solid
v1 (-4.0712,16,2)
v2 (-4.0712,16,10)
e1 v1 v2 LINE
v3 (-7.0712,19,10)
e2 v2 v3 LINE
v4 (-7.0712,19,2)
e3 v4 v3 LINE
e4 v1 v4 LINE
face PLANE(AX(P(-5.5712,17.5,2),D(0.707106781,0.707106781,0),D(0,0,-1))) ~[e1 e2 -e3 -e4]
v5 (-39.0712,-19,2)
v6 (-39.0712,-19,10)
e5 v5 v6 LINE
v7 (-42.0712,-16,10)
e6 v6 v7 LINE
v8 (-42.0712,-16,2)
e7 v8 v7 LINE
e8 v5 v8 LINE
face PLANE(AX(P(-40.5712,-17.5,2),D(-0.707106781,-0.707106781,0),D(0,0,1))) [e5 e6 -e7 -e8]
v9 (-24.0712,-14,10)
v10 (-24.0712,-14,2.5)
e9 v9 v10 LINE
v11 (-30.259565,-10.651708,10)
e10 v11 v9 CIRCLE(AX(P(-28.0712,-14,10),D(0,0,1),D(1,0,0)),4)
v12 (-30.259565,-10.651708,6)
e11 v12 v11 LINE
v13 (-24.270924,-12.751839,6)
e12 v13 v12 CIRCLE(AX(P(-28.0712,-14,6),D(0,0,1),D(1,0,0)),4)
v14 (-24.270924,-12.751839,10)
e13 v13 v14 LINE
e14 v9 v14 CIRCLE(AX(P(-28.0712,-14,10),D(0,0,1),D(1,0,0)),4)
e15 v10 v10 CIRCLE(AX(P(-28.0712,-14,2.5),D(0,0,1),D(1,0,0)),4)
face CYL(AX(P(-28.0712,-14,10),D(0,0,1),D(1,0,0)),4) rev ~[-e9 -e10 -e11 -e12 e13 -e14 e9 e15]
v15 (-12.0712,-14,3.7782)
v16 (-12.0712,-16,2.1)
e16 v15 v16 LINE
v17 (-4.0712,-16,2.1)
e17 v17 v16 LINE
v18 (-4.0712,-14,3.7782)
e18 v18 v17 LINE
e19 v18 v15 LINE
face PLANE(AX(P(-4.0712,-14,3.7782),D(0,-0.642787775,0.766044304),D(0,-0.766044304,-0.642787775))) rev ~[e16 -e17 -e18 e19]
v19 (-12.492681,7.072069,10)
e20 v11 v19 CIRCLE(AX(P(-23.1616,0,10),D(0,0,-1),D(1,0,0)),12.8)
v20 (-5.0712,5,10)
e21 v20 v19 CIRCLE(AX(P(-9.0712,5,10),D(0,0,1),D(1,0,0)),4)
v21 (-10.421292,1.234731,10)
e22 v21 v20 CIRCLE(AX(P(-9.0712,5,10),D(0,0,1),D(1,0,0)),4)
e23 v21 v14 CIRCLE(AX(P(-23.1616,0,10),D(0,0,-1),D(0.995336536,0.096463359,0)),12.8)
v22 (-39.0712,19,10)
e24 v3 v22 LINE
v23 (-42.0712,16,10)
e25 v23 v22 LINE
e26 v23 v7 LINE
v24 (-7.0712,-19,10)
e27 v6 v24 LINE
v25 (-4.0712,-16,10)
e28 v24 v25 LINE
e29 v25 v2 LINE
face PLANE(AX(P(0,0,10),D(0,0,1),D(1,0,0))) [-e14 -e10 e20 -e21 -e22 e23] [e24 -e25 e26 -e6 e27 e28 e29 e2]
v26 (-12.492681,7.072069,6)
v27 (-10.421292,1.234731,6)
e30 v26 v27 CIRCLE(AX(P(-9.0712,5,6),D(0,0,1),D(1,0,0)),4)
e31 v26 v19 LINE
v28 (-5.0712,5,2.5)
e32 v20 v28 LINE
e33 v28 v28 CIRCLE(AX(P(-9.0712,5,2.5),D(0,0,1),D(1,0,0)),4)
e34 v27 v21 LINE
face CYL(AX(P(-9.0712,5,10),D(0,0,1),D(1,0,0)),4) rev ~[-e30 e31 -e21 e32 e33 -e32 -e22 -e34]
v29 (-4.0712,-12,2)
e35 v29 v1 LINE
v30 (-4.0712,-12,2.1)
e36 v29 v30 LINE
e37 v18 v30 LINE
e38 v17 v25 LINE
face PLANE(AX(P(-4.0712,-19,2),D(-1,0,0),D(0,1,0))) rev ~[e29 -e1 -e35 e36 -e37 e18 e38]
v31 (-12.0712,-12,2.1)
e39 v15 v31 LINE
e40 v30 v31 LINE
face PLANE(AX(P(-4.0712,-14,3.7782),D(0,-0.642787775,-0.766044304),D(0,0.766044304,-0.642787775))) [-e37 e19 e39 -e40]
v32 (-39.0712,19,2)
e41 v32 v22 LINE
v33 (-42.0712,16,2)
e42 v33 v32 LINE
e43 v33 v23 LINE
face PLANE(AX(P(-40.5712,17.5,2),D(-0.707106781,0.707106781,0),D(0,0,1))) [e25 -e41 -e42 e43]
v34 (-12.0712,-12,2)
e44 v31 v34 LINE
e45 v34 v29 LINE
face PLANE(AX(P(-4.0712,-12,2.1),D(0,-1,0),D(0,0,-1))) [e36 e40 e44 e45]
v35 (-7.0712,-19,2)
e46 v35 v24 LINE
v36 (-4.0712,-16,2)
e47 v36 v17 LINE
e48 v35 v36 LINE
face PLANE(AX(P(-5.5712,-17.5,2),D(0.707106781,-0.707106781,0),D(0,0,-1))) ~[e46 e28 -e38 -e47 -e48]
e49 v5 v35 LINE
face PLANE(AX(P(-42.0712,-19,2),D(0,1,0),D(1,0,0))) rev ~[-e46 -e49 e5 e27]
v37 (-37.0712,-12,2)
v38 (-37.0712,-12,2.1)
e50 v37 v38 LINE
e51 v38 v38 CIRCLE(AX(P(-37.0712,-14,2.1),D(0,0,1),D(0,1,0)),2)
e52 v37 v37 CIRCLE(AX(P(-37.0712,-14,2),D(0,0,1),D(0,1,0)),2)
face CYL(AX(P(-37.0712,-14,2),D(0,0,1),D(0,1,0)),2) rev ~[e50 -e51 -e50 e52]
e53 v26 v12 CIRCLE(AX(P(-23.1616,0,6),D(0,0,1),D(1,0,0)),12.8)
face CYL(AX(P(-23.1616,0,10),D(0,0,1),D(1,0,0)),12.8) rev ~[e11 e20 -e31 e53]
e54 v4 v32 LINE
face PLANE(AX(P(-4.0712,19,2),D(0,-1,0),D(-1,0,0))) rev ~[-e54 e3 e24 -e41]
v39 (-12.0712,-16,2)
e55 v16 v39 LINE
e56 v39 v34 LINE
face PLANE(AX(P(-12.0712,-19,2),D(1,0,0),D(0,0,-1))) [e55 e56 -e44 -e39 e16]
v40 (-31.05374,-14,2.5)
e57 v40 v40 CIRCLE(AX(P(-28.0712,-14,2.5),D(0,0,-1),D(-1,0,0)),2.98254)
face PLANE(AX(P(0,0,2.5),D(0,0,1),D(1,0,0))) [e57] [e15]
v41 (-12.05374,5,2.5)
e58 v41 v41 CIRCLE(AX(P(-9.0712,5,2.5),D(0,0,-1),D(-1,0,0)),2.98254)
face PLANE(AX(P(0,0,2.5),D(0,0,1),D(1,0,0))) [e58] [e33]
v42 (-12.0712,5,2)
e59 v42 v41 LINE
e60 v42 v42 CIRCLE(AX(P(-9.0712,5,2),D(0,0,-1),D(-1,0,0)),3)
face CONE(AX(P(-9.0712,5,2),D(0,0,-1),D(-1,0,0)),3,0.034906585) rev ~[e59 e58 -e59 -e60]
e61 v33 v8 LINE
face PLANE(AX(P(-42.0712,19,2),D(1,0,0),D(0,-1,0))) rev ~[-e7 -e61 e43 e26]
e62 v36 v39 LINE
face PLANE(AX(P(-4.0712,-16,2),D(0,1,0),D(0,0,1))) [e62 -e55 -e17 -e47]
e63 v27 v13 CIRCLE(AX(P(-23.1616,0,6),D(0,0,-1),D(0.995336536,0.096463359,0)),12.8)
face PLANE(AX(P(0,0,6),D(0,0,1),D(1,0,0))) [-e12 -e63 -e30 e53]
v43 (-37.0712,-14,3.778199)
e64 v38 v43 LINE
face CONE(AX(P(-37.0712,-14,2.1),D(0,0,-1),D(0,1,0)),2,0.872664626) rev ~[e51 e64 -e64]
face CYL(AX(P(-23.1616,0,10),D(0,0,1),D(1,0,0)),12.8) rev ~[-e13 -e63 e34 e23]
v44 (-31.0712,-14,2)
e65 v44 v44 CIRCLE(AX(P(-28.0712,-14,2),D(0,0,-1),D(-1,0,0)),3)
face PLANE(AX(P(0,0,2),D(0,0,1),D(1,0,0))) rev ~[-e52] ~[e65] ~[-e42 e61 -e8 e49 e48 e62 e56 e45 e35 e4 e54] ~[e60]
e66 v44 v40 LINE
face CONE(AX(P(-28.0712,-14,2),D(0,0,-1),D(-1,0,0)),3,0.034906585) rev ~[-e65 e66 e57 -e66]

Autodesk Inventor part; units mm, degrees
ref_plane "YZ Plane" through (0, 0, 0) normal (1, 0, 0) x (0, 1, 0)
ref_plane "XZ Plane" through (0, 0, 0) normal (0, 1, 0) x (-1, 0, 0)
ref_plane "XY Plane" through (0, 0, 0) normal (0, 0, 1) x (1, 0, 0)
ref_plane "Work Plane1" through (0, 0, 2) normal (0, 0, 1) x (1, 0, 0)
sketch "Sketch1" plane through (0, 0, 2) normal (0, 0, 1) x (1, 0, 0)
  line L0 (-37.0712, 14) -> (-9.0712, 14) construction
  line L1 (-9.0712, 14) -> (-9.0712, -14) construction
  line L2 (-9.0712, -14) -> (-37.0712, -14) construction
  line L3 (-37.0712, -14) -> (-37.0712, 14) construction
  line L4 (-4.0712, -19) -> (-4.0712, 19)
  line L5 (-4.0712, 19) -> (-42.0712, 19)
  line L6 (-42.0712, 19) -> (-42.0712, -19)
  line L7 (-42.0712, -19) -> (-4.0712, -19)
  circle A0 centre (-23.0712, 0) radius 12.8
  point P0 (0, 0)
  dimension "d0" = 5
extrude "Extrusion1" add sketch "Sketch1" along normal blind 8 contours L7 L6 L5 L4 | A0
sketch "Sketch3" plane through (0, 0, 2) normal (0, 0, -1) x (-1, 0, 0)
  circle A0 centre (9.0712, -14) radius 1.45 construction
  circle A1 centre (9.0712, -14) radius 2.45
  circle A2 centre (37.0712, -14) radius 1.45 projected
  circle A3 centre (37.0712, -14) radius 1.95
  point P0 (0, 0)
  dimension "d8" = 1
  dimension "d10" = 0.5
chamfer "Chamfer1" distance 3 angle 45 4 edges at (-42.0712, 19, 6) (-4.0712, 19, 6) (-4.0712, -19, 6) (-42.0712, -19, 6)
hole "Hole1" at (-37.0712, -14, 2) direction (0, 0, 1) diameter 4 depth 0.1 tip angle 100
sketch "Sketch4" plane through (-4.0712, -19, 2) normal (1, 0, 0) x (0, 0, -1)
  line L0 (2, 4.45) -> (6, 4.45)
  line L1 (2, 1.55) -> (6, 1.55)
  line L2 (0, 0) -> (0, 38) projected
  arc A0 (2, 19) -> (2, 19) centre (1.5, 4.4206) ccw projected
  line L3 (-1.7782, 5) -> (-0.1, 7) projected
  line L4 (-1.7782, 5) -> (-0.1, 3) projected
  line L5 (-0.1, 7) -> (0.6045, 7)
  line L6 (0.6045, 7) -> (0.6045, 3)
  line L7 (0.6045, 3) -> (-0.1, 3)
  line L8 (-0.1, 3) -> (-0.1, 7)
extrude "Extrusion4" cut sketch "Sketch4" against normal blind 8 contours L7 L8 L5 L2 | L2 L5 L6 L7 | L4 L3 L8
ref_plane "Arbeitsebene2" through (-23.0712, -12, 2) normal (1, 0, 0) x (0, 0, -1)
ref_plane "Arbeitsebene3" through (-39.0712, 0, 2) normal (0, -1, 0) x (1, 0, 0)
sketch "Skizze9" plane through (0, 0, 2) normal (0, 0, -1) x (-1, 0, 0)
  line L0 (12.0712, -16) -> (4.0712, -16) projected
  line L1 (7.0712, -19) -> (4.0712, -16) projected
  line L2 (39.0712, -19) -> (7.0712, -19) projected
  line L3 (42.0712, -16) -> (39.0712, -19) projected
  line L4 (42.0712, 16) -> (42.0712, -16) projected
  line L5 (39.0712, 19) -> (42.0712, 16) projected
  line L6 (7.0712, 19) -> (39.0712, 19) projected
  line L7 (4.0712, 16) -> (7.0712, 19) projected
  line L8 (4.0712, -12) -> (4.0712, 16) projected
  line L9 (4.0712, -12) -> (12.0712, -12) projected
  line L10 (12.0712, -12) -> (12.0712, -16) projected
  circle A0 centre (37.0712, -14) radius 2 projected
  circle A1 centre (28.0712, -14) radius 3
  circle A2 centre (9.0712, 5) radius 3
  point P0 (0, 0)
  dimension "d54" = 6
  dimension "d55" = 6
  dimension "d56" = 14
  dimension "d57" = 5
  dimension "d58" = 5
  dimension "d59" = 14
extrude "Extrusion9" cut sketch "Skizze9" against normal blind 3 draft -2 contours A1 | A2
sketch "Skizze10" plane through (0, 0, 10) normal (0, 0, 1) x (1, 0, 0)
  circle A0 centre (-9.0712, 5) radius 4.05 projected
  circle A1 centre (-28.0712, -14) radius 4.55 projected
  circle A2 centre (-9.0712, 5) radius 4
  circle A3 centre (-28.0712, -14) radius 2.8952 projected
  circle A4 centre (-28.0712, -14) radius 4
  point P0 (0, 0)
  dimension "d62" = 8
  dimension "d63" = 8
extrude "Extrusion10" cut sketch "Skizze10" against normal blind 7.5 contours A2 | A3 | A4
sketch "Skizze11" plane through (0, 0, 10) normal (0, 0, 1) x (1, 0, 0)
  circle A0 centre (-28.0712, -14) radius 4 projected
  circle A1 centre (-9.0712, 5) radius 4 projected
  line L0 (-39.0712, -19) -> (-42.0712, -16) projected
  line L1 (-39.0712, -19) -> (-7.0712, -19) projected
  line L2 (-4.0712, -16) -> (-7.0712, -19) projected
  line L3 (-4.0712, -16) -> (-4.0712, 16) projected
  line L4 (-7.0712, 19) -> (-4.0712, 16) projected
  line L5 (-7.0712, 19) -> (-39.0712, 19) projected
  line L6 (-42.0712, 16) -> (-39.0712, 19) projected
  line L7 (-42.0712, 16) -> (-42.0712, -16) projected
  circle A2 centre (-23.1616, 0) radius 12.8
  point P0 (0, 0)
  dimension "d66" = 25.6
extrude "Extrusion11" cut sketch "Skizze11" against normal blind 4 contours A2 A0 | A0 A2 A1 | A2 A1 picked at (-27.171, -11.4329) picked at (-11.706, 4.065)
equation "\"d54\" = d55"
equation "\"d59\" = d56"
properties part number "20_Cube_Insert_Kinematic_Thorlabs_1inch_pro_magnetic"
